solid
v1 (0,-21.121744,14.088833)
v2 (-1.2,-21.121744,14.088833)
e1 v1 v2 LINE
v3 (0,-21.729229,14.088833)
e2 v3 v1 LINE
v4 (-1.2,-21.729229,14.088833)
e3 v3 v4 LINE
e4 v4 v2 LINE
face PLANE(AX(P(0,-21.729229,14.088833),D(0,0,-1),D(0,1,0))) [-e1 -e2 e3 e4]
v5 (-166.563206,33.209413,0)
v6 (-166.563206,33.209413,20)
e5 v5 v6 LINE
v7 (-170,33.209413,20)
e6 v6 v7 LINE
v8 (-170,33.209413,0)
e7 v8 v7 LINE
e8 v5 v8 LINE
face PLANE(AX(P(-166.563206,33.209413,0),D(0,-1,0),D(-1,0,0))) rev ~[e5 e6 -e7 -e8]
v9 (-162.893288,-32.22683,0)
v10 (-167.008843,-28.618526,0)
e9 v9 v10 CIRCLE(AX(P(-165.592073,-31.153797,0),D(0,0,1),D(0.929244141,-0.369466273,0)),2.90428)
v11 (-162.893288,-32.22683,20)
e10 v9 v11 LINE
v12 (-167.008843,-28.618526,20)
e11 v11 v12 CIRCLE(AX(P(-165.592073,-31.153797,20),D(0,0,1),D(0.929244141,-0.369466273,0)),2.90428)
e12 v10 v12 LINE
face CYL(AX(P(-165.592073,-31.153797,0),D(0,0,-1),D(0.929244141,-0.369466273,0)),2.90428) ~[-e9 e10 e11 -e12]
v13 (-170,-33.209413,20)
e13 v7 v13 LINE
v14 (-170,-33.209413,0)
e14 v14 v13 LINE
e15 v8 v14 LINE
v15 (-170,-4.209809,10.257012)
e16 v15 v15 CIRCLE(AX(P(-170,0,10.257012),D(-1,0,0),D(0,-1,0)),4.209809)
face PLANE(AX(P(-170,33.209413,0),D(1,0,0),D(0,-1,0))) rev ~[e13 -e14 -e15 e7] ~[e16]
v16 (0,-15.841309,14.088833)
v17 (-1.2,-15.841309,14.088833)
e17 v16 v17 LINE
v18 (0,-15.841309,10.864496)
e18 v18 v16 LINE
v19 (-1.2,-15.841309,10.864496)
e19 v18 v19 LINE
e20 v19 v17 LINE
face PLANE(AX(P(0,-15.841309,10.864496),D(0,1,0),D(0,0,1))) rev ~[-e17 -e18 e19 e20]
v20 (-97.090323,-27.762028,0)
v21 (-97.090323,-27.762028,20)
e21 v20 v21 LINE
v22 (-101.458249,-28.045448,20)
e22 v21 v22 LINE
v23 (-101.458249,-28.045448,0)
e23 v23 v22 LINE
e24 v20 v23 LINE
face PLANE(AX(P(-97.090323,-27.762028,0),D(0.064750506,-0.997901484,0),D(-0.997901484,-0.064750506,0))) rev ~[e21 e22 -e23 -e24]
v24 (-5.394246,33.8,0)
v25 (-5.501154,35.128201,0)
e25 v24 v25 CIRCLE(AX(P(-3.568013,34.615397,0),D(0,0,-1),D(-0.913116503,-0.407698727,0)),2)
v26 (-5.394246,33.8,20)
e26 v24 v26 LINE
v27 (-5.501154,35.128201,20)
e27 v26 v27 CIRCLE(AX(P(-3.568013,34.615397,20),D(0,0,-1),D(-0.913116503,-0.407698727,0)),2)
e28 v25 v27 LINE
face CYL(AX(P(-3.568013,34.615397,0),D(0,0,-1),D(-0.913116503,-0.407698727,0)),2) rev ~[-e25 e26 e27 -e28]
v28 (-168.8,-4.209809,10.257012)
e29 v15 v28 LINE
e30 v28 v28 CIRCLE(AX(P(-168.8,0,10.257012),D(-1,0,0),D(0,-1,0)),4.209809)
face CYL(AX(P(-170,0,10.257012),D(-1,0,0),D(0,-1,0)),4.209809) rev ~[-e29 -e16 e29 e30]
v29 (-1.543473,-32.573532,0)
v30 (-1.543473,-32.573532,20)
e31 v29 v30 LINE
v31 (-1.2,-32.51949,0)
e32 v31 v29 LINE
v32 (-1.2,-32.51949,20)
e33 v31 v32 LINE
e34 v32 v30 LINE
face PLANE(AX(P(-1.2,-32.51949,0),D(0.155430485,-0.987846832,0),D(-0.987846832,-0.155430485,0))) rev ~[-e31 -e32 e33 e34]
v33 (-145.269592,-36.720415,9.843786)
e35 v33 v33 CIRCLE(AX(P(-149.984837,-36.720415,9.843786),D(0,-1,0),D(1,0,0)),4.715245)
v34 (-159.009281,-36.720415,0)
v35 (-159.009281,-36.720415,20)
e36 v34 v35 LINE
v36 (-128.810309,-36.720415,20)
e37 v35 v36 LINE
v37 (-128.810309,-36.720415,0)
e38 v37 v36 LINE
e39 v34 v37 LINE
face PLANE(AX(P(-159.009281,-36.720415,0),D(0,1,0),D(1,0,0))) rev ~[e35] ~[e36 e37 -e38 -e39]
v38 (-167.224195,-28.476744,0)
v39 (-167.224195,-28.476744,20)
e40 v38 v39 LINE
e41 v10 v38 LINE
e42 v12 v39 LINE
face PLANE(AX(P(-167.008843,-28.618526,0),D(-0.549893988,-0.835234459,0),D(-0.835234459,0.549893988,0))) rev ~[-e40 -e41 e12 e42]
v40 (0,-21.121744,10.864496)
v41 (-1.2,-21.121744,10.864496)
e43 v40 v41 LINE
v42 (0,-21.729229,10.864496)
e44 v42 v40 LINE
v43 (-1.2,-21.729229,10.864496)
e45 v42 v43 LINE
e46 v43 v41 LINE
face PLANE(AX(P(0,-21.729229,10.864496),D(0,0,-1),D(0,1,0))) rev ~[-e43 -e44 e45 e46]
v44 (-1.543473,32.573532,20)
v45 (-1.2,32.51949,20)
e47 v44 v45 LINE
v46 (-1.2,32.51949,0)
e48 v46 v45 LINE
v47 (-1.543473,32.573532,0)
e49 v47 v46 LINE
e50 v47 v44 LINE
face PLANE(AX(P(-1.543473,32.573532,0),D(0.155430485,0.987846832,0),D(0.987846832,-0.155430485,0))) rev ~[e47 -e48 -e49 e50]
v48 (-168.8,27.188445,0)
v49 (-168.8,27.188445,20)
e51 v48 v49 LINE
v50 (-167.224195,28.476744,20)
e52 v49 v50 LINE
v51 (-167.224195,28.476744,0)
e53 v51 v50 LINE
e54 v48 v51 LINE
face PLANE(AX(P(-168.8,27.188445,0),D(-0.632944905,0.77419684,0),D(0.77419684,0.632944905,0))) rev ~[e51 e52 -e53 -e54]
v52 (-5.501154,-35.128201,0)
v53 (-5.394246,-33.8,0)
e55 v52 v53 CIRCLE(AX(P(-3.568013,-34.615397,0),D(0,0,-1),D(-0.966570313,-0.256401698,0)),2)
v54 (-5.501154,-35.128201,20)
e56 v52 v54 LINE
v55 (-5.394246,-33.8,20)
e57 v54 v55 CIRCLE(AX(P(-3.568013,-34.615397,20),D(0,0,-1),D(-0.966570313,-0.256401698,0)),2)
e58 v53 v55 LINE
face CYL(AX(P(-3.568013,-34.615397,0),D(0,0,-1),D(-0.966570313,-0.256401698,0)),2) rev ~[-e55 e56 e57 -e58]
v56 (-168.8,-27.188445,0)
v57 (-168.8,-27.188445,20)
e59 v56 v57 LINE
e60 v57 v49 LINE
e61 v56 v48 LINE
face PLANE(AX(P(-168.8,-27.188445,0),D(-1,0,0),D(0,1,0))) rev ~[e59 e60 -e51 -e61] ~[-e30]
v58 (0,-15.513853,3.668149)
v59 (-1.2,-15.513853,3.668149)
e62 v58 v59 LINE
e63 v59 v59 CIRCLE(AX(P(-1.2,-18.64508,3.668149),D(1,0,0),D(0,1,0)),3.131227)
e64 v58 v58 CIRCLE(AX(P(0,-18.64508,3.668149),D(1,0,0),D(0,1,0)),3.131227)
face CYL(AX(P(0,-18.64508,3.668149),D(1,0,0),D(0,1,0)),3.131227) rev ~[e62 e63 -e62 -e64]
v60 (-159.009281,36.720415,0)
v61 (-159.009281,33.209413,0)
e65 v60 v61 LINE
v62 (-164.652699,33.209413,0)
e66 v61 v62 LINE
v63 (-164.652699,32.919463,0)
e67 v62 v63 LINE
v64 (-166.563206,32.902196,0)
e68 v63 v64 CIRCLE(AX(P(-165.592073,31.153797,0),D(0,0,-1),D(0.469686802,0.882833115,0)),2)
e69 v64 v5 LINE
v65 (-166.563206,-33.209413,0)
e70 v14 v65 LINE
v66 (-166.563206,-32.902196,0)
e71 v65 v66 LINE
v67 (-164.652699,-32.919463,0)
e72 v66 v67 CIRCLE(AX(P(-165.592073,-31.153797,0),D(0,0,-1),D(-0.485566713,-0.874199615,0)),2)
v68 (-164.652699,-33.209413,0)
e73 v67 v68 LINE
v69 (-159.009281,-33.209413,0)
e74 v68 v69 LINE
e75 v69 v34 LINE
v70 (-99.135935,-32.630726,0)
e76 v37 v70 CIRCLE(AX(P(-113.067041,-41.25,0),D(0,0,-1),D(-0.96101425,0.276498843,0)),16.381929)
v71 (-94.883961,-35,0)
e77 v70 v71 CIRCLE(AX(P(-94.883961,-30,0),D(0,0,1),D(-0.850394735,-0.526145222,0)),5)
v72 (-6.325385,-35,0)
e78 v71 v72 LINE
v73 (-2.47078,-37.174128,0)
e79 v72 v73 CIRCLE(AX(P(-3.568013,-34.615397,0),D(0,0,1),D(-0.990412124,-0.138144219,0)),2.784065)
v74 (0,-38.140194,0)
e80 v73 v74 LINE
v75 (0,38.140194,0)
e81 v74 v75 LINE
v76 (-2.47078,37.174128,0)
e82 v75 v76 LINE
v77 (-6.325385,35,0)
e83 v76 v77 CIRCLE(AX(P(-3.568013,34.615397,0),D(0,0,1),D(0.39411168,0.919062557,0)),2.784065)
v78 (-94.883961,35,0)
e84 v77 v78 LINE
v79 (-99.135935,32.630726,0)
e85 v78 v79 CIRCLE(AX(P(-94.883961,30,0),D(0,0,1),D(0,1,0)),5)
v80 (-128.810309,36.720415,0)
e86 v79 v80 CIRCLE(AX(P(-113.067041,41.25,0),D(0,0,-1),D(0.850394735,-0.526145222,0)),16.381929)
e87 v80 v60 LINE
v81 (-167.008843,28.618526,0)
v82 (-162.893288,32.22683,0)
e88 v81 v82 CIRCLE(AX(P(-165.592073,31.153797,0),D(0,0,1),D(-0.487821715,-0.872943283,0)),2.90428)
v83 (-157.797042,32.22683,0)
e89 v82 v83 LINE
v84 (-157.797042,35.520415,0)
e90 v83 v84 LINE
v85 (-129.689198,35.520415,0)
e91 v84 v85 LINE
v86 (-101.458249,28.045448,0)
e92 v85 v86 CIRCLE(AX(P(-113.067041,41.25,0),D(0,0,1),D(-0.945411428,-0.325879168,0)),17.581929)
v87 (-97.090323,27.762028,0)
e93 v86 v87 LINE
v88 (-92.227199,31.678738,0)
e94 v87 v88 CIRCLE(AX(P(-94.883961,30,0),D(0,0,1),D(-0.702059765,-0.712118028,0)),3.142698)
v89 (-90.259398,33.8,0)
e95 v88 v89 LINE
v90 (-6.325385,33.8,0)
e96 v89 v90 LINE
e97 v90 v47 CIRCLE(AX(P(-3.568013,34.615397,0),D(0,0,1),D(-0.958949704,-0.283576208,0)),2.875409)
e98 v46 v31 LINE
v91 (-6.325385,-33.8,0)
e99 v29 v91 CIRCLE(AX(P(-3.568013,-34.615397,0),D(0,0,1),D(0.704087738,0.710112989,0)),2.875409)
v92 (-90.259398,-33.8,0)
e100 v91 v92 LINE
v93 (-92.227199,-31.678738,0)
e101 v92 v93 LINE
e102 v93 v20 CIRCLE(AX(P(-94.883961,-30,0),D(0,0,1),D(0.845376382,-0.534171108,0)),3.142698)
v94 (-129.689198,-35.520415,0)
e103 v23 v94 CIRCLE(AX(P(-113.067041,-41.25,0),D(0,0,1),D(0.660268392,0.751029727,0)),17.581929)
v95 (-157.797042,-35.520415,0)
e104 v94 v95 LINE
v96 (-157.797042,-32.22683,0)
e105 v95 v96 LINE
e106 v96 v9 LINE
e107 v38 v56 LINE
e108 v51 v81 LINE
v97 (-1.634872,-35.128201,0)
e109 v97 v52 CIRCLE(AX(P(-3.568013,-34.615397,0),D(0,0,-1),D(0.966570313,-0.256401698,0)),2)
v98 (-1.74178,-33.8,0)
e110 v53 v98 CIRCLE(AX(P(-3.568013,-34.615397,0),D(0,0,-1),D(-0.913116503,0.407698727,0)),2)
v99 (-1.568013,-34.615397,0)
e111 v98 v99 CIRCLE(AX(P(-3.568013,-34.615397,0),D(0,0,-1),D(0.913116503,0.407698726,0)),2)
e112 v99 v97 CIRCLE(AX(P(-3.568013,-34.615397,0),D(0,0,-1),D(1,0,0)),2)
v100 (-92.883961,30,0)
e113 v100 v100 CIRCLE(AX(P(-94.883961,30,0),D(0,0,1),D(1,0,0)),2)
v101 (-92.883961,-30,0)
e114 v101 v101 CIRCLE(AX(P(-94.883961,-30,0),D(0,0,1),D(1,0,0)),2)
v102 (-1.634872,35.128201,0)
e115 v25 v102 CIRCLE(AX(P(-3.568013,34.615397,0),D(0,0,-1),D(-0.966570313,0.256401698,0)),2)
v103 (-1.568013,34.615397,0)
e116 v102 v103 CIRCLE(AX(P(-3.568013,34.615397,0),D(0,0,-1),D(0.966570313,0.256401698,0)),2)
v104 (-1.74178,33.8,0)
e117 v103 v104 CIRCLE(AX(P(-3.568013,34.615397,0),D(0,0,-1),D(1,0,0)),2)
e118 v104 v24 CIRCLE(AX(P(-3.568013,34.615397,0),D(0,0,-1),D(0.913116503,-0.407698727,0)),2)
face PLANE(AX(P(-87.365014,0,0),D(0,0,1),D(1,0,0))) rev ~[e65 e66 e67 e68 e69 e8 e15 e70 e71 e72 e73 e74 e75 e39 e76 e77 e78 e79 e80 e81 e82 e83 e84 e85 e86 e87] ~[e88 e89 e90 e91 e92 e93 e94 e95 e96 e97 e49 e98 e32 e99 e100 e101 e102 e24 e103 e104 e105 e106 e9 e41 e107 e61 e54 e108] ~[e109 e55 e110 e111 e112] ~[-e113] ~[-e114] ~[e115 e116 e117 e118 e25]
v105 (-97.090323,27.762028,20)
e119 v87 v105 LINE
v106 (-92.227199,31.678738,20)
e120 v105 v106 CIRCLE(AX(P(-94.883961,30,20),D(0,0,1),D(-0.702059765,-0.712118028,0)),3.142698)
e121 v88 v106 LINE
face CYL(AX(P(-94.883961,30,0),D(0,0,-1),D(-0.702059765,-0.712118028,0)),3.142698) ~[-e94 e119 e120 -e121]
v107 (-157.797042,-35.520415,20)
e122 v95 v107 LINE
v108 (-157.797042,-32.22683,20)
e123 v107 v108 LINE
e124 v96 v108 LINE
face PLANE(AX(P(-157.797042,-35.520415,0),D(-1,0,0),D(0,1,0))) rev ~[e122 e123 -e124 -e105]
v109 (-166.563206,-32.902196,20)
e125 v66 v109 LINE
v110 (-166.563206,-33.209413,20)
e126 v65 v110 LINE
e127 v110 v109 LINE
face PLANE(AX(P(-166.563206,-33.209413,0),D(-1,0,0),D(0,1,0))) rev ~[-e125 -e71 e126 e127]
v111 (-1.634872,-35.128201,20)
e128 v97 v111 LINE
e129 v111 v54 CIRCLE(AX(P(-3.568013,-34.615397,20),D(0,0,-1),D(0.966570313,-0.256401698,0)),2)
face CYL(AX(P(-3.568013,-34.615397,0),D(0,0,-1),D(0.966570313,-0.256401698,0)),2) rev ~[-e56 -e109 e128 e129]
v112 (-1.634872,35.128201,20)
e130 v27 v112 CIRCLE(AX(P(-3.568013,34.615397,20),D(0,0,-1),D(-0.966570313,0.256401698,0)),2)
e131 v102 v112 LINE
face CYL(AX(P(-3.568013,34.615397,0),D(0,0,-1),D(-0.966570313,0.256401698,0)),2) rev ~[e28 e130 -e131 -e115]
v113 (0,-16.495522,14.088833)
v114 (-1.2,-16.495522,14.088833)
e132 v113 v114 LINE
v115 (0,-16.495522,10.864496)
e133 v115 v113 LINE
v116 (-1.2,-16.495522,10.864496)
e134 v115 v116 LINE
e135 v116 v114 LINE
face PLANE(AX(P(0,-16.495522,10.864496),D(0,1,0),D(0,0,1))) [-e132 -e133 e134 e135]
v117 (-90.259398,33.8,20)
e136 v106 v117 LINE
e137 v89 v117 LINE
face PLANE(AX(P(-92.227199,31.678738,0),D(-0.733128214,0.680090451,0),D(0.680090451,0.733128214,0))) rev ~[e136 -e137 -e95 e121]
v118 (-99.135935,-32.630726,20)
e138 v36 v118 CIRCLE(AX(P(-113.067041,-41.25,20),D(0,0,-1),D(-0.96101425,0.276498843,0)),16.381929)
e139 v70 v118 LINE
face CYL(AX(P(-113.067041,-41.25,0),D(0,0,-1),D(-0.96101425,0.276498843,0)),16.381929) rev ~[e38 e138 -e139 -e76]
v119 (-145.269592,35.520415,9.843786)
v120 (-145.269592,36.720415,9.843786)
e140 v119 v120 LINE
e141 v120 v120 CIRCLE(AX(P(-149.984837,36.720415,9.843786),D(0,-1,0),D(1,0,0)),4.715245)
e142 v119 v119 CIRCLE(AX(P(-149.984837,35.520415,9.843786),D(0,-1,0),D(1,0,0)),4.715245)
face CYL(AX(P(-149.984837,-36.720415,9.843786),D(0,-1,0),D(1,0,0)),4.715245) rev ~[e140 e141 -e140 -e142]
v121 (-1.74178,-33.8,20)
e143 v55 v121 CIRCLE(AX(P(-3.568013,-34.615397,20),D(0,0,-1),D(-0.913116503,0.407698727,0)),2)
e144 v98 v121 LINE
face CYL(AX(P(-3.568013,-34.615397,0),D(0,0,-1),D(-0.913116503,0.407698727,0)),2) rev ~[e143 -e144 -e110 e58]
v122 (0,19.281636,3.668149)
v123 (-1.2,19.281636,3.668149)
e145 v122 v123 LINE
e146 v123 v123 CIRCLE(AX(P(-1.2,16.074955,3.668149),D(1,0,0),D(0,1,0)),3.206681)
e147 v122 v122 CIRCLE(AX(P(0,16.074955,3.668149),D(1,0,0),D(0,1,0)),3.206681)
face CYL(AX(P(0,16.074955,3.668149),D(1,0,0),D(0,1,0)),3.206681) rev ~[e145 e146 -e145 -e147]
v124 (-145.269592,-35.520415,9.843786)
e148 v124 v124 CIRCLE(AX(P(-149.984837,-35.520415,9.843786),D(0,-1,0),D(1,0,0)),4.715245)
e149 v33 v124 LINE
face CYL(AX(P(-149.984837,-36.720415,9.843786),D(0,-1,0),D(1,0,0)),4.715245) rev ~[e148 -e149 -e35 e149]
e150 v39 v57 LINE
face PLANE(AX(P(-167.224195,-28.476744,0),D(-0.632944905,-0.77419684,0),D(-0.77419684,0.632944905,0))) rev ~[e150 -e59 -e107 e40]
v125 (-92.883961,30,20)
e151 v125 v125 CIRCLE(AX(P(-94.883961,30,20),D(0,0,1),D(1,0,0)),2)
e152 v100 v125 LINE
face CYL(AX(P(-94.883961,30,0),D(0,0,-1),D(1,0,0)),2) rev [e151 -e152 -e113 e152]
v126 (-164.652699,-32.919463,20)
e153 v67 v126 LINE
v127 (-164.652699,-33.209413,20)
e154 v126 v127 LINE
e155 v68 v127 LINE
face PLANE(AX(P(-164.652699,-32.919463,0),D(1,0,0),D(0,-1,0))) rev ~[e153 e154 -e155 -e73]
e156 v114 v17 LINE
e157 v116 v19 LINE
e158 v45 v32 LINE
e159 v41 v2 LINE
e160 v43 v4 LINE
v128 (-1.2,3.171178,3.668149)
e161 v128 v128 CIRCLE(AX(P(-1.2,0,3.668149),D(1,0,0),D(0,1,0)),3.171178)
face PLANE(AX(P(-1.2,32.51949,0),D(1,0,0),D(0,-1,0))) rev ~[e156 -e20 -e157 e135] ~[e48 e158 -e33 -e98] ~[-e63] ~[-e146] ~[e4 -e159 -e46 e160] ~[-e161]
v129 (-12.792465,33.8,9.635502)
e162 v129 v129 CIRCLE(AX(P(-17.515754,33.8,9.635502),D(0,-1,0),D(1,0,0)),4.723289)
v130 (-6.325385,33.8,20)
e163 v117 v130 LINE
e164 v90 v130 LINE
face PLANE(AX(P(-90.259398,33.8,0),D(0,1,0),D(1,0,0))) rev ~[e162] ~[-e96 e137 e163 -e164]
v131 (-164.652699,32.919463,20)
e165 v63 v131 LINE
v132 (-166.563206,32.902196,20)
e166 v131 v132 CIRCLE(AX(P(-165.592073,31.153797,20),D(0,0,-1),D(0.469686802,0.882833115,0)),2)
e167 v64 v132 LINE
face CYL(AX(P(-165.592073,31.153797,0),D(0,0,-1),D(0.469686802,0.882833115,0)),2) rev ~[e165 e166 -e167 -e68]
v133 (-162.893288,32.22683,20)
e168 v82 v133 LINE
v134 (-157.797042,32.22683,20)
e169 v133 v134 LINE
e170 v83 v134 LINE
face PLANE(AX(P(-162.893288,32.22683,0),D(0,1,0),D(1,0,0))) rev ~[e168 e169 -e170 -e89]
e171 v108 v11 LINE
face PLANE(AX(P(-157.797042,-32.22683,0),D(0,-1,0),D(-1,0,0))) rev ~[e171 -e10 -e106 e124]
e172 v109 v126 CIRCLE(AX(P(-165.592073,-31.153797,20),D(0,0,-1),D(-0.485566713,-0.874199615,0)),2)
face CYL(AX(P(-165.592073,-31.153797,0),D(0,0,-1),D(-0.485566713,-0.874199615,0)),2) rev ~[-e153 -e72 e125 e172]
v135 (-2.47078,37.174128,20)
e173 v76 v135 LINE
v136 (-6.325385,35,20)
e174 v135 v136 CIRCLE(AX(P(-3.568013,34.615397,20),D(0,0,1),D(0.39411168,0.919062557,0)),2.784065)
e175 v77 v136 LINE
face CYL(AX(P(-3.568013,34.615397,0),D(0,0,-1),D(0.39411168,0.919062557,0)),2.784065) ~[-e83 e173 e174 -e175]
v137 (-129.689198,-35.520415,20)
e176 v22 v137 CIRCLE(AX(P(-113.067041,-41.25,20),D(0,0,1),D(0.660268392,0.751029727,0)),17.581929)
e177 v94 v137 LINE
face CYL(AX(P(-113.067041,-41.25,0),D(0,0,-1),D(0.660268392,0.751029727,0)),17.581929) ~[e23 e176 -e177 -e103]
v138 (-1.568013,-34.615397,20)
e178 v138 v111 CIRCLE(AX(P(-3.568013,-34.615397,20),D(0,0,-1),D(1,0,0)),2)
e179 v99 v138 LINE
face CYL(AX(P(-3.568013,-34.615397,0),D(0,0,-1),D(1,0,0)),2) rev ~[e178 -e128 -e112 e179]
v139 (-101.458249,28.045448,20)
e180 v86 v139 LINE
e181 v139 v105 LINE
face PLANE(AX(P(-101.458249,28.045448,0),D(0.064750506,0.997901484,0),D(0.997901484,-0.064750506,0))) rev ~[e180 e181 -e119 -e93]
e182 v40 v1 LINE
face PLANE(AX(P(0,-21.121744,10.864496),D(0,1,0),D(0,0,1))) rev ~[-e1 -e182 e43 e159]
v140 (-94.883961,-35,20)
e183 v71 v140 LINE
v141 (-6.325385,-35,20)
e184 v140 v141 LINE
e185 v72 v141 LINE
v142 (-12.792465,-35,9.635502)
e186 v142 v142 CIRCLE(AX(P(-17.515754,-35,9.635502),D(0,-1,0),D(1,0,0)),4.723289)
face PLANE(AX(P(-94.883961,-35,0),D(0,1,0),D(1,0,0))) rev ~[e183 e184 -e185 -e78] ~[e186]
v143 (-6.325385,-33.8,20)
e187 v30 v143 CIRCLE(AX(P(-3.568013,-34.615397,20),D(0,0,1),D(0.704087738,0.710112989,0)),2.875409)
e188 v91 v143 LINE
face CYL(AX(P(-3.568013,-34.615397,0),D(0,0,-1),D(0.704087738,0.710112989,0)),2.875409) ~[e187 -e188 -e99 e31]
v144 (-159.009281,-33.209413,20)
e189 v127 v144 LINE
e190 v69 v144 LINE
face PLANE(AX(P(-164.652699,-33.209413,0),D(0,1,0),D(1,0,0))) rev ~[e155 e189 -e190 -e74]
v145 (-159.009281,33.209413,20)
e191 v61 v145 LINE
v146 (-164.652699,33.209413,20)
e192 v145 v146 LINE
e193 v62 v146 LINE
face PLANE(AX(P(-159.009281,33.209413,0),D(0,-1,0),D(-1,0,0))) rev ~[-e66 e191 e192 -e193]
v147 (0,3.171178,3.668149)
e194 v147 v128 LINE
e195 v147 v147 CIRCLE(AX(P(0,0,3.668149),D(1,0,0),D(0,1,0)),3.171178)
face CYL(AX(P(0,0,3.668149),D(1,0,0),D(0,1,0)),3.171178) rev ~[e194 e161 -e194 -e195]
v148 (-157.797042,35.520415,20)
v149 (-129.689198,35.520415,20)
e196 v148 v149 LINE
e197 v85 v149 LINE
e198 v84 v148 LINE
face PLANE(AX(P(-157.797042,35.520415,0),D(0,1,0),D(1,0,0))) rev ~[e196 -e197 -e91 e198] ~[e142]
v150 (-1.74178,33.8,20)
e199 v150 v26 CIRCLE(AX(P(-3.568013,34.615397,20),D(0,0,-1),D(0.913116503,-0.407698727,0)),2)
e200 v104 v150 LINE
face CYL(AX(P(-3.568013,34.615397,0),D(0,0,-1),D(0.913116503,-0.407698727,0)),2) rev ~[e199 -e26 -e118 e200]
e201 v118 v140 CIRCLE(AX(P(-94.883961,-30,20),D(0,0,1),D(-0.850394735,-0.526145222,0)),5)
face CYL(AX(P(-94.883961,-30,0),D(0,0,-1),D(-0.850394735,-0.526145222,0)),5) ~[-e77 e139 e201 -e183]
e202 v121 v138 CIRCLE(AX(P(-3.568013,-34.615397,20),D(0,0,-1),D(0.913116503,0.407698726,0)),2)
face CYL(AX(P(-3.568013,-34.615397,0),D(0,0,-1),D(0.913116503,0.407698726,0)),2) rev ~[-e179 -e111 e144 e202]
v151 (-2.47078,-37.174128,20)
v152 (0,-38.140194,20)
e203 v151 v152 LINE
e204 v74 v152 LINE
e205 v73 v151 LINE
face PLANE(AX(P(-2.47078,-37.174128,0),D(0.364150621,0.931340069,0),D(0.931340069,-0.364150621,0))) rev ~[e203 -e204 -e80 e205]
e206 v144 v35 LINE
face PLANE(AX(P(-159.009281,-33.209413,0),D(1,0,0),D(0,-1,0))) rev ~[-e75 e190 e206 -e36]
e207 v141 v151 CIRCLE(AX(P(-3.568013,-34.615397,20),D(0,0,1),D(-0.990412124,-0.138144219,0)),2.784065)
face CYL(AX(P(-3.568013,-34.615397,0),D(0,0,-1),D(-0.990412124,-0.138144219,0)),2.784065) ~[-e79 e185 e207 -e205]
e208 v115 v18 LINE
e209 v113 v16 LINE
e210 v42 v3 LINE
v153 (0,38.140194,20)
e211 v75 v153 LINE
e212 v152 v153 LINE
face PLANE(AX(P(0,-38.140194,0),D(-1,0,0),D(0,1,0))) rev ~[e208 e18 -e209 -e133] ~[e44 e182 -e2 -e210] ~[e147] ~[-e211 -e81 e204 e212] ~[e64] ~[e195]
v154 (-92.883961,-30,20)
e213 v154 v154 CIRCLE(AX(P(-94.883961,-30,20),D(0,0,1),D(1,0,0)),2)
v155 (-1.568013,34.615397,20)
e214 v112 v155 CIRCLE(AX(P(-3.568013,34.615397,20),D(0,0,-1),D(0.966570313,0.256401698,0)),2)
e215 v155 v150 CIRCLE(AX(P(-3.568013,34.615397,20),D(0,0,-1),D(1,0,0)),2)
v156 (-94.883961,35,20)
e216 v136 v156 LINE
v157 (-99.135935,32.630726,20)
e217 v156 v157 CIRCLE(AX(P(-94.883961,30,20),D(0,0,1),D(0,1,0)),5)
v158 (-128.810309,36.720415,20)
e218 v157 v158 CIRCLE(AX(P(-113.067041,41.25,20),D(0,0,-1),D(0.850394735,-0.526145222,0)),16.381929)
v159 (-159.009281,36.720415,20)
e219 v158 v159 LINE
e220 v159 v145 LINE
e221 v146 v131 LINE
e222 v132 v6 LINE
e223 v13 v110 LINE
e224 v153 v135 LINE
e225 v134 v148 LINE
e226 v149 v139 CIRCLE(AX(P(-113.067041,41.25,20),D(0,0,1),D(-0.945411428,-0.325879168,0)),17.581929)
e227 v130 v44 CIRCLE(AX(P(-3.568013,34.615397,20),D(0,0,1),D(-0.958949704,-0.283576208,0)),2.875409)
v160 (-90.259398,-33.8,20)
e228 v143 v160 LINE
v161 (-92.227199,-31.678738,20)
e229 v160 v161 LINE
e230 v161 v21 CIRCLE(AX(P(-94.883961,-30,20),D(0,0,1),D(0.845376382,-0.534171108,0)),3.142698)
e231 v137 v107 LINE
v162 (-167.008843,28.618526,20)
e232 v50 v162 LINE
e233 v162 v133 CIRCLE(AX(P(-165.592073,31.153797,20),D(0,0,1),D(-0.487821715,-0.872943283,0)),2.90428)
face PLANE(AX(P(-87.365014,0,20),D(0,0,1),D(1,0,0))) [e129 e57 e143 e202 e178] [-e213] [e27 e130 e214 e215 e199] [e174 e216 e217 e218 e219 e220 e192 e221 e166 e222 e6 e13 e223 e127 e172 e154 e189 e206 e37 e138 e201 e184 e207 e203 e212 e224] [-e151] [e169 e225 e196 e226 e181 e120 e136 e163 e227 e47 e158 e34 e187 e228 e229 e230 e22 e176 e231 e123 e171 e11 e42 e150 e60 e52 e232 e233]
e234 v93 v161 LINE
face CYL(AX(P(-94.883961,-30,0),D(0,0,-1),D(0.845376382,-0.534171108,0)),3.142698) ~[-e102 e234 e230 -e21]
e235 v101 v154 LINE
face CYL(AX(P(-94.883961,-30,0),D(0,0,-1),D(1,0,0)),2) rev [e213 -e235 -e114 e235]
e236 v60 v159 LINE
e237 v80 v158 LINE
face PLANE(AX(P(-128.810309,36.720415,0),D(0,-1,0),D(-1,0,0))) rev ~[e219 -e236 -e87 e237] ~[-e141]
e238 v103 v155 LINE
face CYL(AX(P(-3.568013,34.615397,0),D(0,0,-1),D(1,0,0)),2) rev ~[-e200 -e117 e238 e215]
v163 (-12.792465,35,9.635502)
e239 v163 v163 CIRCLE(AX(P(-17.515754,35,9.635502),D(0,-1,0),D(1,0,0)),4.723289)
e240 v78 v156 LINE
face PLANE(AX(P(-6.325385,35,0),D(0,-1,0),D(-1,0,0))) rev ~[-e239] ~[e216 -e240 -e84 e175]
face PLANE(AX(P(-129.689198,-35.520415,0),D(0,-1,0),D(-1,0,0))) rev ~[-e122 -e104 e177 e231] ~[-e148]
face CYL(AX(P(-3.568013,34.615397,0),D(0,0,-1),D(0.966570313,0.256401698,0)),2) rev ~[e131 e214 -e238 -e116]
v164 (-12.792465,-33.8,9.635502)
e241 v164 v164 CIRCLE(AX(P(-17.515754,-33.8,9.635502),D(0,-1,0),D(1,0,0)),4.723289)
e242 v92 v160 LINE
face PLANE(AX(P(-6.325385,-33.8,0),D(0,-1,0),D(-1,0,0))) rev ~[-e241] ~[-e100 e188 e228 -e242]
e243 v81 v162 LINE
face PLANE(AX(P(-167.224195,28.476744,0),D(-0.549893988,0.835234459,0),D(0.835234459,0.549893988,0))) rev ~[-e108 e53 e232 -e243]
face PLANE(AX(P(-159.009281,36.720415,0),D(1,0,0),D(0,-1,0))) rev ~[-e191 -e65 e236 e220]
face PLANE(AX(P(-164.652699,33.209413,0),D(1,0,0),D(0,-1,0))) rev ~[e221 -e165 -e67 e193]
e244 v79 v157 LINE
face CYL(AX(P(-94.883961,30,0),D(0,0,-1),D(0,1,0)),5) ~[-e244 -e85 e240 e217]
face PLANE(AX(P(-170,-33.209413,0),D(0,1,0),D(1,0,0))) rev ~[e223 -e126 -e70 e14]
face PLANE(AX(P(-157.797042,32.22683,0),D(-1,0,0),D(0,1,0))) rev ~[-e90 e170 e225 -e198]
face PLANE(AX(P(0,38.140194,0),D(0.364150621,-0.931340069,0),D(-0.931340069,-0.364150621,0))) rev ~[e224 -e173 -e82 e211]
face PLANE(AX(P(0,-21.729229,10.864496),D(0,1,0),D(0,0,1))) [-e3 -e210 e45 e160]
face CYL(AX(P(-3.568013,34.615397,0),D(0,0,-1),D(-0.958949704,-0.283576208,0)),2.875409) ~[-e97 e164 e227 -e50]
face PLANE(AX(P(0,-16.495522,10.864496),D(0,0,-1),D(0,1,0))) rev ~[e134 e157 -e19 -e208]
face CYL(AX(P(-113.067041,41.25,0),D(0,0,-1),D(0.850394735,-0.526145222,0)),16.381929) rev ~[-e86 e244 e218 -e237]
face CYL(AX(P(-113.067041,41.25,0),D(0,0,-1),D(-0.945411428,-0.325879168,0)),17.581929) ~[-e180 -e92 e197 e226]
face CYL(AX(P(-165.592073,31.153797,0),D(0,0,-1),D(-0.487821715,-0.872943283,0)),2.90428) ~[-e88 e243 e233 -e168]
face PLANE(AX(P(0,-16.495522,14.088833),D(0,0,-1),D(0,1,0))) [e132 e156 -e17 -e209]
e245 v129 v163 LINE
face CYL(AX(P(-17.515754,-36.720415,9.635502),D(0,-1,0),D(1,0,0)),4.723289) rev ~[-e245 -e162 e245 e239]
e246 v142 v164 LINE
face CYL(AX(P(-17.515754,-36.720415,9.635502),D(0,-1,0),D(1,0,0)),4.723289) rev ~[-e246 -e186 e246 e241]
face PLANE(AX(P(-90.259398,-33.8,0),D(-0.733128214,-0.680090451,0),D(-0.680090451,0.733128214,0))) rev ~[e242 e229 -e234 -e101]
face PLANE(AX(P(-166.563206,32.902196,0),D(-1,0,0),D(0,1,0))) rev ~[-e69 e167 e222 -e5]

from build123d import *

# Parameters (mm, degrees)
F0_R     = 2
F1_DEPTH = 20
F2_R     = 4.7152449582
F2_R_2   = 4.7232891339
F3_DEPTH = 108
F4_R     = 4.2098088582
F5_DEPTH = 25
F6_R     = 3.1711780618
F6_R_2   = 3.2066806009
F6_R_3   = 3.1312270379
F6_W     = 0.6074849516
F6_H     = 3.2243365422
F6_W_2   = 0.6542131305
F7_DEPTH = 25


# Not quite as in the source:
# - a feature names something its author has since deleted; it is built from what else it names


with BuildPart() as f1:
    # F0 (on Top) → F1 (new body)
    with BuildSketch(Plane.XY):
        with BuildLine():
            Line((-164.65269916, 33.20941329), (-164.65269916, 32.9194632454))
            ThreePointArc((-164.65269916, 32.9194632454), (-165.5739976736, 29.1538786951), (-166.563206189, 32.902196247))
            Line((-166.563206189, 32.902196247), (-166.563206189, 33.20941329))
            Line((-166.563206189, 33.20941329), (-170, 33.20941329))
            Line((-170, 33.20941329), (-170, 0))
            Line((-170, 0), (-170, -33.20941329))
            Line((-170, -33.20941329), (-166.563206189, -33.20941329))
            Line((-166.563206189, -33.20941329), (-166.563206189, -32.902196247))
            ThreePointArc((-166.563206189, -32.902196247), (-165.5739976736, -29.1538786951), (-164.65269916, -32.9194632454))
            Line((-164.65269916, -32.9194632454), (-164.65269916, -33.20941329))
            Line((-164.65269916, -33.20941329), (-163.2265451578, -33.20941329))
            Line((-163.2265451578, -33.20941329), (-159.009280774, -33.20941329))
            Line((-159.009280774, -33.20941329), (-159.009280774, -36.7204154693))
            Line((-159.009280774, -36.7204154693), (-157.7970415085, -36.7204154693))
            Line((-157.7970415085, -36.7204154693), (-128.8103089121, -36.7204154693))
            ThreePointArc((-128.8103089121, -36.7204154693), (-115.3036395578, -25.0214683637), (-99.1359348061, -32.6307261124))
            ThreePointArc((-99.1359348061, -32.6307261124), (-97.3177205123, -34.3677013727), (-94.8839611325, -35))
            Line((-94.8839611325, -35), (-6.3253850676, -35))
            ThreePointArc((-6.3253850676, -35), (-4.9357568901, -37.0403297798), (-2.4707801799, -37.1741277646))
            Line((-2.4707801799, -37.1741277646), (0, -38.1401939384))
            Line((0, -38.1401939384), (0, -35))
            Line((0, -35), (0, 0))
            Line((0, 0), (0, 35))
            Line((0, 35), (0, 38.1401939384))
            Line((0, 38.1401939384), (-2.4707801799, 37.1741277646))
            ThreePointArc((-2.4707801799, 37.1741277646), (-4.9357568901, 37.0403297798), (-6.3253850676, 35))
            Line((-6.3253850676, 35), (-94.8839611325, 35))
            ThreePointArc((-94.8839611325, 35), (-97.3177205123, 34.3677013727), (-99.1359348061, 32.6307261124))
            ThreePointArc((-99.1359348061, 32.6307261124), (-115.3036395578, 25.0214683637), (-128.8103089121, 36.7204154693))
            Line((-128.8103089121, 36.7204154693), (-157.7970415085, 36.7204154693))
            Line((-157.7970415085, 36.7204154693), (-159.009280774, 36.7204154693))
            Line((-159.009280774, 36.7204154693), (-159.009280774, 33.20941329))
            Line((-159.009280774, 33.20941329), (-163.2265451578, 33.20941329))
            Line((-163.2265451578, 33.20941329), (-164.65269916, 33.20941329))
        make_face()
        with Locations((-94.8839611325, -30)):
            Circle(F0_R, mode=Mode.SUBTRACT)
        with BuildLine():
            ThreePointArc((-1.5680128924, -34.6153974533), (-1.5847981725, -34.8739692511), (-1.6348722671, -35.1282008489))
            ThreePointArc((-1.6348722671, -35.1282008489), (-3.5680128924, -36.6153974533), (-5.5011535178, -35.1282008489))
            ThreePointArc((-5.5011535178, -35.1282008489), (-5.561565475, -34.4549353061), (-5.3942458987, -33.8))
            ThreePointArc((-5.3942458987, -33.8), (-3.5680128924, -32.6153974533), (-1.7417798862, -33.8))
            ThreePointArc((-1.7417798862, -33.8), (-1.6119369721, -34.1985437695), (-1.5680128924, -34.6153974533))
        make_face(mode=Mode.SUBTRACT)
        with Locations((-94.8839611325, 30)):
            Circle(F0_R, mode=Mode.SUBTRACT)
        with BuildLine():
            Line((-1.5434729926, 32.5735324938), (-1.2, 32.5194895267))
            Line((-1.2, 32.5194895267), (-1.2, 0))
            Line((-1.2, 0), (-1.2, -32.5194895267))
            Line((-1.2, -32.5194895267), (-1.5434729926, -32.5735324938))
            ThreePointArc((-1.5434729926, -32.5735324938), (-4.2823772406, -31.8301402125), (-6.3253850676, -33.8))
            Line((-6.3253850676, -33.8), (-90.2593984932, -33.8))
            Line((-90.2593984932, -33.8), (-92.2271985619, -31.6787384118))
            ThreePointArc((-92.2271985619, -31.6787384118), (-92.912700117, -27.5524134293), (-97.0903228742, -27.7620281778))
            Line((-97.0903228742, -27.7620281778), (-101.4582490544, -28.045448372))
            ThreePointArc((-101.4582490544, -28.045448372), (-117.5672901619, -24.2537650751), (-129.6891982841, -35.5204154693))
            Line((-129.6891982841, -35.5204154693), (-155.884909603, -35.5204154693))
            Line((-155.884909603, -35.5204154693), (-157.7970415085, -35.5204154693))
            Line((-157.7970415085, -35.5204154693), (-157.7970415085, -32.2268303811))
            Line((-157.7970415085, -32.2268303811), (-162.8932879486, -32.2268303811))
            ThreePointArc((-162.8932879486, -32.2268303811), (-163.6774302758, -28.9699966079), (-167.0088434251, -28.6185256358))
            Line((-167.0088434251, -28.6185256358), (-167.2241950518, -28.4767444108))
            Line((-167.2241950518, -28.4767444108), (-168.8, -27.1884445101))
            Line((-168.8, -27.1884445101), (-168.8, 0))
            Line((-168.8, 0), (-168.8, 27.1884445101))
            Line((-168.8, 27.1884445101), (-167.2241950518, 28.4767444108))
            Line((-167.2241950518, 28.4767444108), (-167.0088434251, 28.6185256358))
            ThreePointArc((-167.0088434251, 28.6185256358), (-163.6774302758, 28.9699966079), (-162.8932879486, 32.2268303811))
            Line((-162.8932879486, 32.2268303811), (-157.7970415085, 32.2268303811))
            Line((-157.7970415085, 32.2268303811), (-157.7970415085, 35.5204154693))
            Line((-157.7970415085, 35.5204154693), (-155.884909603, 35.5204154693))
            Line((-155.884909603, 35.5204154693), (-129.6891982841, 35.5204154693))
            ThreePointArc((-129.6891982841, 35.5204154693), (-117.5672901619, 24.2537650751), (-101.4582490544, 28.045448372))
            Line((-101.4582490544, 28.045448372), (-97.0903228742, 27.7620281778))
            ThreePointArc((-97.0903228742, 27.7620281778), (-92.912700117, 27.5524134293), (-92.2271985619, 31.6787384118))
            Line((-92.2271985619, 31.6787384118), (-90.2593984932, 33.8))
            Line((-90.2593984932, 33.8), (-6.3253850676, 33.8))
            ThreePointArc((-6.3253850676, 33.8), (-4.2823772406, 31.8301402125), (-1.5434729926, 32.5735324938))
        make_face(mode=Mode.SUBTRACT)
        with BuildLine():
            ThreePointArc((-1.7417798862, 33.8), (-3.5680128924, 32.6153974533), (-5.3942458987, 33.8))
            ThreePointArc((-5.3942458987, 33.8), (-5.561565475, 34.4549353061), (-5.5011535178, 35.1282008489))
            ThreePointArc((-5.5011535178, 35.1282008489), (-3.5680128924, 36.6153974533), (-1.6348722671, 35.1282008489))
            ThreePointArc((-1.6348722671, 35.1282008489), (-1.5847981725, 34.8739692511), (-1.5680128924, 34.6153974533))
            ThreePointArc((-1.5680128924, 34.6153974533), (-1.6119369721, 34.1985437695), (-1.7417798862, 33.8))
        make_face(mode=Mode.SUBTRACT)
    extrude(amount=F1_DEPTH)

    # F2 (on face) → F3 (cut)
    with BuildSketch(Plane.XZ.offset(36.7204154693)):
        with Locations((-149.9848365784, 9.8437862471)):
            Circle(F2_R)
        with Locations((-17.5157543272, 9.6355015412)):
            Circle(F2_R_2)
    extrude(amount=-F3_DEPTH, mode=Mode.SUBTRACT)

    # F4 (on face) → F5 (cut)
    with BuildSketch(Plane(origin=(-170, 0, 0), x_dir=(0, -1, 0), z_dir=(-1, 0, 0))):
        with Locations((0, 10.2570122108)):
            Circle(F4_R)
    extrude(amount=-F5_DEPTH, mode=Mode.SUBTRACT)

    # F6 (on face) → F7 (cut)
    with BuildSketch(Plane.YZ):
        with Locations((0, 3.6681490019)):
            Circle(F6_R)
        with Locations((16.0749554634, 3.6681490019)):
            Circle(F6_R_2)
        with Locations((-18.6450798064, 3.6681490019)):
            Circle(F6_R_3)
        with Locations((-21.4254865423, 12.4766645022)):
            Rectangle(F6_W, F6_H)
        with Locations((-16.1684155464, 12.4766645022)):
            Rectangle(F6_W_2, F6_H)
    extrude(amount=-F7_DEPTH, mode=Mode.SUBTRACT)


solid = f1.part
